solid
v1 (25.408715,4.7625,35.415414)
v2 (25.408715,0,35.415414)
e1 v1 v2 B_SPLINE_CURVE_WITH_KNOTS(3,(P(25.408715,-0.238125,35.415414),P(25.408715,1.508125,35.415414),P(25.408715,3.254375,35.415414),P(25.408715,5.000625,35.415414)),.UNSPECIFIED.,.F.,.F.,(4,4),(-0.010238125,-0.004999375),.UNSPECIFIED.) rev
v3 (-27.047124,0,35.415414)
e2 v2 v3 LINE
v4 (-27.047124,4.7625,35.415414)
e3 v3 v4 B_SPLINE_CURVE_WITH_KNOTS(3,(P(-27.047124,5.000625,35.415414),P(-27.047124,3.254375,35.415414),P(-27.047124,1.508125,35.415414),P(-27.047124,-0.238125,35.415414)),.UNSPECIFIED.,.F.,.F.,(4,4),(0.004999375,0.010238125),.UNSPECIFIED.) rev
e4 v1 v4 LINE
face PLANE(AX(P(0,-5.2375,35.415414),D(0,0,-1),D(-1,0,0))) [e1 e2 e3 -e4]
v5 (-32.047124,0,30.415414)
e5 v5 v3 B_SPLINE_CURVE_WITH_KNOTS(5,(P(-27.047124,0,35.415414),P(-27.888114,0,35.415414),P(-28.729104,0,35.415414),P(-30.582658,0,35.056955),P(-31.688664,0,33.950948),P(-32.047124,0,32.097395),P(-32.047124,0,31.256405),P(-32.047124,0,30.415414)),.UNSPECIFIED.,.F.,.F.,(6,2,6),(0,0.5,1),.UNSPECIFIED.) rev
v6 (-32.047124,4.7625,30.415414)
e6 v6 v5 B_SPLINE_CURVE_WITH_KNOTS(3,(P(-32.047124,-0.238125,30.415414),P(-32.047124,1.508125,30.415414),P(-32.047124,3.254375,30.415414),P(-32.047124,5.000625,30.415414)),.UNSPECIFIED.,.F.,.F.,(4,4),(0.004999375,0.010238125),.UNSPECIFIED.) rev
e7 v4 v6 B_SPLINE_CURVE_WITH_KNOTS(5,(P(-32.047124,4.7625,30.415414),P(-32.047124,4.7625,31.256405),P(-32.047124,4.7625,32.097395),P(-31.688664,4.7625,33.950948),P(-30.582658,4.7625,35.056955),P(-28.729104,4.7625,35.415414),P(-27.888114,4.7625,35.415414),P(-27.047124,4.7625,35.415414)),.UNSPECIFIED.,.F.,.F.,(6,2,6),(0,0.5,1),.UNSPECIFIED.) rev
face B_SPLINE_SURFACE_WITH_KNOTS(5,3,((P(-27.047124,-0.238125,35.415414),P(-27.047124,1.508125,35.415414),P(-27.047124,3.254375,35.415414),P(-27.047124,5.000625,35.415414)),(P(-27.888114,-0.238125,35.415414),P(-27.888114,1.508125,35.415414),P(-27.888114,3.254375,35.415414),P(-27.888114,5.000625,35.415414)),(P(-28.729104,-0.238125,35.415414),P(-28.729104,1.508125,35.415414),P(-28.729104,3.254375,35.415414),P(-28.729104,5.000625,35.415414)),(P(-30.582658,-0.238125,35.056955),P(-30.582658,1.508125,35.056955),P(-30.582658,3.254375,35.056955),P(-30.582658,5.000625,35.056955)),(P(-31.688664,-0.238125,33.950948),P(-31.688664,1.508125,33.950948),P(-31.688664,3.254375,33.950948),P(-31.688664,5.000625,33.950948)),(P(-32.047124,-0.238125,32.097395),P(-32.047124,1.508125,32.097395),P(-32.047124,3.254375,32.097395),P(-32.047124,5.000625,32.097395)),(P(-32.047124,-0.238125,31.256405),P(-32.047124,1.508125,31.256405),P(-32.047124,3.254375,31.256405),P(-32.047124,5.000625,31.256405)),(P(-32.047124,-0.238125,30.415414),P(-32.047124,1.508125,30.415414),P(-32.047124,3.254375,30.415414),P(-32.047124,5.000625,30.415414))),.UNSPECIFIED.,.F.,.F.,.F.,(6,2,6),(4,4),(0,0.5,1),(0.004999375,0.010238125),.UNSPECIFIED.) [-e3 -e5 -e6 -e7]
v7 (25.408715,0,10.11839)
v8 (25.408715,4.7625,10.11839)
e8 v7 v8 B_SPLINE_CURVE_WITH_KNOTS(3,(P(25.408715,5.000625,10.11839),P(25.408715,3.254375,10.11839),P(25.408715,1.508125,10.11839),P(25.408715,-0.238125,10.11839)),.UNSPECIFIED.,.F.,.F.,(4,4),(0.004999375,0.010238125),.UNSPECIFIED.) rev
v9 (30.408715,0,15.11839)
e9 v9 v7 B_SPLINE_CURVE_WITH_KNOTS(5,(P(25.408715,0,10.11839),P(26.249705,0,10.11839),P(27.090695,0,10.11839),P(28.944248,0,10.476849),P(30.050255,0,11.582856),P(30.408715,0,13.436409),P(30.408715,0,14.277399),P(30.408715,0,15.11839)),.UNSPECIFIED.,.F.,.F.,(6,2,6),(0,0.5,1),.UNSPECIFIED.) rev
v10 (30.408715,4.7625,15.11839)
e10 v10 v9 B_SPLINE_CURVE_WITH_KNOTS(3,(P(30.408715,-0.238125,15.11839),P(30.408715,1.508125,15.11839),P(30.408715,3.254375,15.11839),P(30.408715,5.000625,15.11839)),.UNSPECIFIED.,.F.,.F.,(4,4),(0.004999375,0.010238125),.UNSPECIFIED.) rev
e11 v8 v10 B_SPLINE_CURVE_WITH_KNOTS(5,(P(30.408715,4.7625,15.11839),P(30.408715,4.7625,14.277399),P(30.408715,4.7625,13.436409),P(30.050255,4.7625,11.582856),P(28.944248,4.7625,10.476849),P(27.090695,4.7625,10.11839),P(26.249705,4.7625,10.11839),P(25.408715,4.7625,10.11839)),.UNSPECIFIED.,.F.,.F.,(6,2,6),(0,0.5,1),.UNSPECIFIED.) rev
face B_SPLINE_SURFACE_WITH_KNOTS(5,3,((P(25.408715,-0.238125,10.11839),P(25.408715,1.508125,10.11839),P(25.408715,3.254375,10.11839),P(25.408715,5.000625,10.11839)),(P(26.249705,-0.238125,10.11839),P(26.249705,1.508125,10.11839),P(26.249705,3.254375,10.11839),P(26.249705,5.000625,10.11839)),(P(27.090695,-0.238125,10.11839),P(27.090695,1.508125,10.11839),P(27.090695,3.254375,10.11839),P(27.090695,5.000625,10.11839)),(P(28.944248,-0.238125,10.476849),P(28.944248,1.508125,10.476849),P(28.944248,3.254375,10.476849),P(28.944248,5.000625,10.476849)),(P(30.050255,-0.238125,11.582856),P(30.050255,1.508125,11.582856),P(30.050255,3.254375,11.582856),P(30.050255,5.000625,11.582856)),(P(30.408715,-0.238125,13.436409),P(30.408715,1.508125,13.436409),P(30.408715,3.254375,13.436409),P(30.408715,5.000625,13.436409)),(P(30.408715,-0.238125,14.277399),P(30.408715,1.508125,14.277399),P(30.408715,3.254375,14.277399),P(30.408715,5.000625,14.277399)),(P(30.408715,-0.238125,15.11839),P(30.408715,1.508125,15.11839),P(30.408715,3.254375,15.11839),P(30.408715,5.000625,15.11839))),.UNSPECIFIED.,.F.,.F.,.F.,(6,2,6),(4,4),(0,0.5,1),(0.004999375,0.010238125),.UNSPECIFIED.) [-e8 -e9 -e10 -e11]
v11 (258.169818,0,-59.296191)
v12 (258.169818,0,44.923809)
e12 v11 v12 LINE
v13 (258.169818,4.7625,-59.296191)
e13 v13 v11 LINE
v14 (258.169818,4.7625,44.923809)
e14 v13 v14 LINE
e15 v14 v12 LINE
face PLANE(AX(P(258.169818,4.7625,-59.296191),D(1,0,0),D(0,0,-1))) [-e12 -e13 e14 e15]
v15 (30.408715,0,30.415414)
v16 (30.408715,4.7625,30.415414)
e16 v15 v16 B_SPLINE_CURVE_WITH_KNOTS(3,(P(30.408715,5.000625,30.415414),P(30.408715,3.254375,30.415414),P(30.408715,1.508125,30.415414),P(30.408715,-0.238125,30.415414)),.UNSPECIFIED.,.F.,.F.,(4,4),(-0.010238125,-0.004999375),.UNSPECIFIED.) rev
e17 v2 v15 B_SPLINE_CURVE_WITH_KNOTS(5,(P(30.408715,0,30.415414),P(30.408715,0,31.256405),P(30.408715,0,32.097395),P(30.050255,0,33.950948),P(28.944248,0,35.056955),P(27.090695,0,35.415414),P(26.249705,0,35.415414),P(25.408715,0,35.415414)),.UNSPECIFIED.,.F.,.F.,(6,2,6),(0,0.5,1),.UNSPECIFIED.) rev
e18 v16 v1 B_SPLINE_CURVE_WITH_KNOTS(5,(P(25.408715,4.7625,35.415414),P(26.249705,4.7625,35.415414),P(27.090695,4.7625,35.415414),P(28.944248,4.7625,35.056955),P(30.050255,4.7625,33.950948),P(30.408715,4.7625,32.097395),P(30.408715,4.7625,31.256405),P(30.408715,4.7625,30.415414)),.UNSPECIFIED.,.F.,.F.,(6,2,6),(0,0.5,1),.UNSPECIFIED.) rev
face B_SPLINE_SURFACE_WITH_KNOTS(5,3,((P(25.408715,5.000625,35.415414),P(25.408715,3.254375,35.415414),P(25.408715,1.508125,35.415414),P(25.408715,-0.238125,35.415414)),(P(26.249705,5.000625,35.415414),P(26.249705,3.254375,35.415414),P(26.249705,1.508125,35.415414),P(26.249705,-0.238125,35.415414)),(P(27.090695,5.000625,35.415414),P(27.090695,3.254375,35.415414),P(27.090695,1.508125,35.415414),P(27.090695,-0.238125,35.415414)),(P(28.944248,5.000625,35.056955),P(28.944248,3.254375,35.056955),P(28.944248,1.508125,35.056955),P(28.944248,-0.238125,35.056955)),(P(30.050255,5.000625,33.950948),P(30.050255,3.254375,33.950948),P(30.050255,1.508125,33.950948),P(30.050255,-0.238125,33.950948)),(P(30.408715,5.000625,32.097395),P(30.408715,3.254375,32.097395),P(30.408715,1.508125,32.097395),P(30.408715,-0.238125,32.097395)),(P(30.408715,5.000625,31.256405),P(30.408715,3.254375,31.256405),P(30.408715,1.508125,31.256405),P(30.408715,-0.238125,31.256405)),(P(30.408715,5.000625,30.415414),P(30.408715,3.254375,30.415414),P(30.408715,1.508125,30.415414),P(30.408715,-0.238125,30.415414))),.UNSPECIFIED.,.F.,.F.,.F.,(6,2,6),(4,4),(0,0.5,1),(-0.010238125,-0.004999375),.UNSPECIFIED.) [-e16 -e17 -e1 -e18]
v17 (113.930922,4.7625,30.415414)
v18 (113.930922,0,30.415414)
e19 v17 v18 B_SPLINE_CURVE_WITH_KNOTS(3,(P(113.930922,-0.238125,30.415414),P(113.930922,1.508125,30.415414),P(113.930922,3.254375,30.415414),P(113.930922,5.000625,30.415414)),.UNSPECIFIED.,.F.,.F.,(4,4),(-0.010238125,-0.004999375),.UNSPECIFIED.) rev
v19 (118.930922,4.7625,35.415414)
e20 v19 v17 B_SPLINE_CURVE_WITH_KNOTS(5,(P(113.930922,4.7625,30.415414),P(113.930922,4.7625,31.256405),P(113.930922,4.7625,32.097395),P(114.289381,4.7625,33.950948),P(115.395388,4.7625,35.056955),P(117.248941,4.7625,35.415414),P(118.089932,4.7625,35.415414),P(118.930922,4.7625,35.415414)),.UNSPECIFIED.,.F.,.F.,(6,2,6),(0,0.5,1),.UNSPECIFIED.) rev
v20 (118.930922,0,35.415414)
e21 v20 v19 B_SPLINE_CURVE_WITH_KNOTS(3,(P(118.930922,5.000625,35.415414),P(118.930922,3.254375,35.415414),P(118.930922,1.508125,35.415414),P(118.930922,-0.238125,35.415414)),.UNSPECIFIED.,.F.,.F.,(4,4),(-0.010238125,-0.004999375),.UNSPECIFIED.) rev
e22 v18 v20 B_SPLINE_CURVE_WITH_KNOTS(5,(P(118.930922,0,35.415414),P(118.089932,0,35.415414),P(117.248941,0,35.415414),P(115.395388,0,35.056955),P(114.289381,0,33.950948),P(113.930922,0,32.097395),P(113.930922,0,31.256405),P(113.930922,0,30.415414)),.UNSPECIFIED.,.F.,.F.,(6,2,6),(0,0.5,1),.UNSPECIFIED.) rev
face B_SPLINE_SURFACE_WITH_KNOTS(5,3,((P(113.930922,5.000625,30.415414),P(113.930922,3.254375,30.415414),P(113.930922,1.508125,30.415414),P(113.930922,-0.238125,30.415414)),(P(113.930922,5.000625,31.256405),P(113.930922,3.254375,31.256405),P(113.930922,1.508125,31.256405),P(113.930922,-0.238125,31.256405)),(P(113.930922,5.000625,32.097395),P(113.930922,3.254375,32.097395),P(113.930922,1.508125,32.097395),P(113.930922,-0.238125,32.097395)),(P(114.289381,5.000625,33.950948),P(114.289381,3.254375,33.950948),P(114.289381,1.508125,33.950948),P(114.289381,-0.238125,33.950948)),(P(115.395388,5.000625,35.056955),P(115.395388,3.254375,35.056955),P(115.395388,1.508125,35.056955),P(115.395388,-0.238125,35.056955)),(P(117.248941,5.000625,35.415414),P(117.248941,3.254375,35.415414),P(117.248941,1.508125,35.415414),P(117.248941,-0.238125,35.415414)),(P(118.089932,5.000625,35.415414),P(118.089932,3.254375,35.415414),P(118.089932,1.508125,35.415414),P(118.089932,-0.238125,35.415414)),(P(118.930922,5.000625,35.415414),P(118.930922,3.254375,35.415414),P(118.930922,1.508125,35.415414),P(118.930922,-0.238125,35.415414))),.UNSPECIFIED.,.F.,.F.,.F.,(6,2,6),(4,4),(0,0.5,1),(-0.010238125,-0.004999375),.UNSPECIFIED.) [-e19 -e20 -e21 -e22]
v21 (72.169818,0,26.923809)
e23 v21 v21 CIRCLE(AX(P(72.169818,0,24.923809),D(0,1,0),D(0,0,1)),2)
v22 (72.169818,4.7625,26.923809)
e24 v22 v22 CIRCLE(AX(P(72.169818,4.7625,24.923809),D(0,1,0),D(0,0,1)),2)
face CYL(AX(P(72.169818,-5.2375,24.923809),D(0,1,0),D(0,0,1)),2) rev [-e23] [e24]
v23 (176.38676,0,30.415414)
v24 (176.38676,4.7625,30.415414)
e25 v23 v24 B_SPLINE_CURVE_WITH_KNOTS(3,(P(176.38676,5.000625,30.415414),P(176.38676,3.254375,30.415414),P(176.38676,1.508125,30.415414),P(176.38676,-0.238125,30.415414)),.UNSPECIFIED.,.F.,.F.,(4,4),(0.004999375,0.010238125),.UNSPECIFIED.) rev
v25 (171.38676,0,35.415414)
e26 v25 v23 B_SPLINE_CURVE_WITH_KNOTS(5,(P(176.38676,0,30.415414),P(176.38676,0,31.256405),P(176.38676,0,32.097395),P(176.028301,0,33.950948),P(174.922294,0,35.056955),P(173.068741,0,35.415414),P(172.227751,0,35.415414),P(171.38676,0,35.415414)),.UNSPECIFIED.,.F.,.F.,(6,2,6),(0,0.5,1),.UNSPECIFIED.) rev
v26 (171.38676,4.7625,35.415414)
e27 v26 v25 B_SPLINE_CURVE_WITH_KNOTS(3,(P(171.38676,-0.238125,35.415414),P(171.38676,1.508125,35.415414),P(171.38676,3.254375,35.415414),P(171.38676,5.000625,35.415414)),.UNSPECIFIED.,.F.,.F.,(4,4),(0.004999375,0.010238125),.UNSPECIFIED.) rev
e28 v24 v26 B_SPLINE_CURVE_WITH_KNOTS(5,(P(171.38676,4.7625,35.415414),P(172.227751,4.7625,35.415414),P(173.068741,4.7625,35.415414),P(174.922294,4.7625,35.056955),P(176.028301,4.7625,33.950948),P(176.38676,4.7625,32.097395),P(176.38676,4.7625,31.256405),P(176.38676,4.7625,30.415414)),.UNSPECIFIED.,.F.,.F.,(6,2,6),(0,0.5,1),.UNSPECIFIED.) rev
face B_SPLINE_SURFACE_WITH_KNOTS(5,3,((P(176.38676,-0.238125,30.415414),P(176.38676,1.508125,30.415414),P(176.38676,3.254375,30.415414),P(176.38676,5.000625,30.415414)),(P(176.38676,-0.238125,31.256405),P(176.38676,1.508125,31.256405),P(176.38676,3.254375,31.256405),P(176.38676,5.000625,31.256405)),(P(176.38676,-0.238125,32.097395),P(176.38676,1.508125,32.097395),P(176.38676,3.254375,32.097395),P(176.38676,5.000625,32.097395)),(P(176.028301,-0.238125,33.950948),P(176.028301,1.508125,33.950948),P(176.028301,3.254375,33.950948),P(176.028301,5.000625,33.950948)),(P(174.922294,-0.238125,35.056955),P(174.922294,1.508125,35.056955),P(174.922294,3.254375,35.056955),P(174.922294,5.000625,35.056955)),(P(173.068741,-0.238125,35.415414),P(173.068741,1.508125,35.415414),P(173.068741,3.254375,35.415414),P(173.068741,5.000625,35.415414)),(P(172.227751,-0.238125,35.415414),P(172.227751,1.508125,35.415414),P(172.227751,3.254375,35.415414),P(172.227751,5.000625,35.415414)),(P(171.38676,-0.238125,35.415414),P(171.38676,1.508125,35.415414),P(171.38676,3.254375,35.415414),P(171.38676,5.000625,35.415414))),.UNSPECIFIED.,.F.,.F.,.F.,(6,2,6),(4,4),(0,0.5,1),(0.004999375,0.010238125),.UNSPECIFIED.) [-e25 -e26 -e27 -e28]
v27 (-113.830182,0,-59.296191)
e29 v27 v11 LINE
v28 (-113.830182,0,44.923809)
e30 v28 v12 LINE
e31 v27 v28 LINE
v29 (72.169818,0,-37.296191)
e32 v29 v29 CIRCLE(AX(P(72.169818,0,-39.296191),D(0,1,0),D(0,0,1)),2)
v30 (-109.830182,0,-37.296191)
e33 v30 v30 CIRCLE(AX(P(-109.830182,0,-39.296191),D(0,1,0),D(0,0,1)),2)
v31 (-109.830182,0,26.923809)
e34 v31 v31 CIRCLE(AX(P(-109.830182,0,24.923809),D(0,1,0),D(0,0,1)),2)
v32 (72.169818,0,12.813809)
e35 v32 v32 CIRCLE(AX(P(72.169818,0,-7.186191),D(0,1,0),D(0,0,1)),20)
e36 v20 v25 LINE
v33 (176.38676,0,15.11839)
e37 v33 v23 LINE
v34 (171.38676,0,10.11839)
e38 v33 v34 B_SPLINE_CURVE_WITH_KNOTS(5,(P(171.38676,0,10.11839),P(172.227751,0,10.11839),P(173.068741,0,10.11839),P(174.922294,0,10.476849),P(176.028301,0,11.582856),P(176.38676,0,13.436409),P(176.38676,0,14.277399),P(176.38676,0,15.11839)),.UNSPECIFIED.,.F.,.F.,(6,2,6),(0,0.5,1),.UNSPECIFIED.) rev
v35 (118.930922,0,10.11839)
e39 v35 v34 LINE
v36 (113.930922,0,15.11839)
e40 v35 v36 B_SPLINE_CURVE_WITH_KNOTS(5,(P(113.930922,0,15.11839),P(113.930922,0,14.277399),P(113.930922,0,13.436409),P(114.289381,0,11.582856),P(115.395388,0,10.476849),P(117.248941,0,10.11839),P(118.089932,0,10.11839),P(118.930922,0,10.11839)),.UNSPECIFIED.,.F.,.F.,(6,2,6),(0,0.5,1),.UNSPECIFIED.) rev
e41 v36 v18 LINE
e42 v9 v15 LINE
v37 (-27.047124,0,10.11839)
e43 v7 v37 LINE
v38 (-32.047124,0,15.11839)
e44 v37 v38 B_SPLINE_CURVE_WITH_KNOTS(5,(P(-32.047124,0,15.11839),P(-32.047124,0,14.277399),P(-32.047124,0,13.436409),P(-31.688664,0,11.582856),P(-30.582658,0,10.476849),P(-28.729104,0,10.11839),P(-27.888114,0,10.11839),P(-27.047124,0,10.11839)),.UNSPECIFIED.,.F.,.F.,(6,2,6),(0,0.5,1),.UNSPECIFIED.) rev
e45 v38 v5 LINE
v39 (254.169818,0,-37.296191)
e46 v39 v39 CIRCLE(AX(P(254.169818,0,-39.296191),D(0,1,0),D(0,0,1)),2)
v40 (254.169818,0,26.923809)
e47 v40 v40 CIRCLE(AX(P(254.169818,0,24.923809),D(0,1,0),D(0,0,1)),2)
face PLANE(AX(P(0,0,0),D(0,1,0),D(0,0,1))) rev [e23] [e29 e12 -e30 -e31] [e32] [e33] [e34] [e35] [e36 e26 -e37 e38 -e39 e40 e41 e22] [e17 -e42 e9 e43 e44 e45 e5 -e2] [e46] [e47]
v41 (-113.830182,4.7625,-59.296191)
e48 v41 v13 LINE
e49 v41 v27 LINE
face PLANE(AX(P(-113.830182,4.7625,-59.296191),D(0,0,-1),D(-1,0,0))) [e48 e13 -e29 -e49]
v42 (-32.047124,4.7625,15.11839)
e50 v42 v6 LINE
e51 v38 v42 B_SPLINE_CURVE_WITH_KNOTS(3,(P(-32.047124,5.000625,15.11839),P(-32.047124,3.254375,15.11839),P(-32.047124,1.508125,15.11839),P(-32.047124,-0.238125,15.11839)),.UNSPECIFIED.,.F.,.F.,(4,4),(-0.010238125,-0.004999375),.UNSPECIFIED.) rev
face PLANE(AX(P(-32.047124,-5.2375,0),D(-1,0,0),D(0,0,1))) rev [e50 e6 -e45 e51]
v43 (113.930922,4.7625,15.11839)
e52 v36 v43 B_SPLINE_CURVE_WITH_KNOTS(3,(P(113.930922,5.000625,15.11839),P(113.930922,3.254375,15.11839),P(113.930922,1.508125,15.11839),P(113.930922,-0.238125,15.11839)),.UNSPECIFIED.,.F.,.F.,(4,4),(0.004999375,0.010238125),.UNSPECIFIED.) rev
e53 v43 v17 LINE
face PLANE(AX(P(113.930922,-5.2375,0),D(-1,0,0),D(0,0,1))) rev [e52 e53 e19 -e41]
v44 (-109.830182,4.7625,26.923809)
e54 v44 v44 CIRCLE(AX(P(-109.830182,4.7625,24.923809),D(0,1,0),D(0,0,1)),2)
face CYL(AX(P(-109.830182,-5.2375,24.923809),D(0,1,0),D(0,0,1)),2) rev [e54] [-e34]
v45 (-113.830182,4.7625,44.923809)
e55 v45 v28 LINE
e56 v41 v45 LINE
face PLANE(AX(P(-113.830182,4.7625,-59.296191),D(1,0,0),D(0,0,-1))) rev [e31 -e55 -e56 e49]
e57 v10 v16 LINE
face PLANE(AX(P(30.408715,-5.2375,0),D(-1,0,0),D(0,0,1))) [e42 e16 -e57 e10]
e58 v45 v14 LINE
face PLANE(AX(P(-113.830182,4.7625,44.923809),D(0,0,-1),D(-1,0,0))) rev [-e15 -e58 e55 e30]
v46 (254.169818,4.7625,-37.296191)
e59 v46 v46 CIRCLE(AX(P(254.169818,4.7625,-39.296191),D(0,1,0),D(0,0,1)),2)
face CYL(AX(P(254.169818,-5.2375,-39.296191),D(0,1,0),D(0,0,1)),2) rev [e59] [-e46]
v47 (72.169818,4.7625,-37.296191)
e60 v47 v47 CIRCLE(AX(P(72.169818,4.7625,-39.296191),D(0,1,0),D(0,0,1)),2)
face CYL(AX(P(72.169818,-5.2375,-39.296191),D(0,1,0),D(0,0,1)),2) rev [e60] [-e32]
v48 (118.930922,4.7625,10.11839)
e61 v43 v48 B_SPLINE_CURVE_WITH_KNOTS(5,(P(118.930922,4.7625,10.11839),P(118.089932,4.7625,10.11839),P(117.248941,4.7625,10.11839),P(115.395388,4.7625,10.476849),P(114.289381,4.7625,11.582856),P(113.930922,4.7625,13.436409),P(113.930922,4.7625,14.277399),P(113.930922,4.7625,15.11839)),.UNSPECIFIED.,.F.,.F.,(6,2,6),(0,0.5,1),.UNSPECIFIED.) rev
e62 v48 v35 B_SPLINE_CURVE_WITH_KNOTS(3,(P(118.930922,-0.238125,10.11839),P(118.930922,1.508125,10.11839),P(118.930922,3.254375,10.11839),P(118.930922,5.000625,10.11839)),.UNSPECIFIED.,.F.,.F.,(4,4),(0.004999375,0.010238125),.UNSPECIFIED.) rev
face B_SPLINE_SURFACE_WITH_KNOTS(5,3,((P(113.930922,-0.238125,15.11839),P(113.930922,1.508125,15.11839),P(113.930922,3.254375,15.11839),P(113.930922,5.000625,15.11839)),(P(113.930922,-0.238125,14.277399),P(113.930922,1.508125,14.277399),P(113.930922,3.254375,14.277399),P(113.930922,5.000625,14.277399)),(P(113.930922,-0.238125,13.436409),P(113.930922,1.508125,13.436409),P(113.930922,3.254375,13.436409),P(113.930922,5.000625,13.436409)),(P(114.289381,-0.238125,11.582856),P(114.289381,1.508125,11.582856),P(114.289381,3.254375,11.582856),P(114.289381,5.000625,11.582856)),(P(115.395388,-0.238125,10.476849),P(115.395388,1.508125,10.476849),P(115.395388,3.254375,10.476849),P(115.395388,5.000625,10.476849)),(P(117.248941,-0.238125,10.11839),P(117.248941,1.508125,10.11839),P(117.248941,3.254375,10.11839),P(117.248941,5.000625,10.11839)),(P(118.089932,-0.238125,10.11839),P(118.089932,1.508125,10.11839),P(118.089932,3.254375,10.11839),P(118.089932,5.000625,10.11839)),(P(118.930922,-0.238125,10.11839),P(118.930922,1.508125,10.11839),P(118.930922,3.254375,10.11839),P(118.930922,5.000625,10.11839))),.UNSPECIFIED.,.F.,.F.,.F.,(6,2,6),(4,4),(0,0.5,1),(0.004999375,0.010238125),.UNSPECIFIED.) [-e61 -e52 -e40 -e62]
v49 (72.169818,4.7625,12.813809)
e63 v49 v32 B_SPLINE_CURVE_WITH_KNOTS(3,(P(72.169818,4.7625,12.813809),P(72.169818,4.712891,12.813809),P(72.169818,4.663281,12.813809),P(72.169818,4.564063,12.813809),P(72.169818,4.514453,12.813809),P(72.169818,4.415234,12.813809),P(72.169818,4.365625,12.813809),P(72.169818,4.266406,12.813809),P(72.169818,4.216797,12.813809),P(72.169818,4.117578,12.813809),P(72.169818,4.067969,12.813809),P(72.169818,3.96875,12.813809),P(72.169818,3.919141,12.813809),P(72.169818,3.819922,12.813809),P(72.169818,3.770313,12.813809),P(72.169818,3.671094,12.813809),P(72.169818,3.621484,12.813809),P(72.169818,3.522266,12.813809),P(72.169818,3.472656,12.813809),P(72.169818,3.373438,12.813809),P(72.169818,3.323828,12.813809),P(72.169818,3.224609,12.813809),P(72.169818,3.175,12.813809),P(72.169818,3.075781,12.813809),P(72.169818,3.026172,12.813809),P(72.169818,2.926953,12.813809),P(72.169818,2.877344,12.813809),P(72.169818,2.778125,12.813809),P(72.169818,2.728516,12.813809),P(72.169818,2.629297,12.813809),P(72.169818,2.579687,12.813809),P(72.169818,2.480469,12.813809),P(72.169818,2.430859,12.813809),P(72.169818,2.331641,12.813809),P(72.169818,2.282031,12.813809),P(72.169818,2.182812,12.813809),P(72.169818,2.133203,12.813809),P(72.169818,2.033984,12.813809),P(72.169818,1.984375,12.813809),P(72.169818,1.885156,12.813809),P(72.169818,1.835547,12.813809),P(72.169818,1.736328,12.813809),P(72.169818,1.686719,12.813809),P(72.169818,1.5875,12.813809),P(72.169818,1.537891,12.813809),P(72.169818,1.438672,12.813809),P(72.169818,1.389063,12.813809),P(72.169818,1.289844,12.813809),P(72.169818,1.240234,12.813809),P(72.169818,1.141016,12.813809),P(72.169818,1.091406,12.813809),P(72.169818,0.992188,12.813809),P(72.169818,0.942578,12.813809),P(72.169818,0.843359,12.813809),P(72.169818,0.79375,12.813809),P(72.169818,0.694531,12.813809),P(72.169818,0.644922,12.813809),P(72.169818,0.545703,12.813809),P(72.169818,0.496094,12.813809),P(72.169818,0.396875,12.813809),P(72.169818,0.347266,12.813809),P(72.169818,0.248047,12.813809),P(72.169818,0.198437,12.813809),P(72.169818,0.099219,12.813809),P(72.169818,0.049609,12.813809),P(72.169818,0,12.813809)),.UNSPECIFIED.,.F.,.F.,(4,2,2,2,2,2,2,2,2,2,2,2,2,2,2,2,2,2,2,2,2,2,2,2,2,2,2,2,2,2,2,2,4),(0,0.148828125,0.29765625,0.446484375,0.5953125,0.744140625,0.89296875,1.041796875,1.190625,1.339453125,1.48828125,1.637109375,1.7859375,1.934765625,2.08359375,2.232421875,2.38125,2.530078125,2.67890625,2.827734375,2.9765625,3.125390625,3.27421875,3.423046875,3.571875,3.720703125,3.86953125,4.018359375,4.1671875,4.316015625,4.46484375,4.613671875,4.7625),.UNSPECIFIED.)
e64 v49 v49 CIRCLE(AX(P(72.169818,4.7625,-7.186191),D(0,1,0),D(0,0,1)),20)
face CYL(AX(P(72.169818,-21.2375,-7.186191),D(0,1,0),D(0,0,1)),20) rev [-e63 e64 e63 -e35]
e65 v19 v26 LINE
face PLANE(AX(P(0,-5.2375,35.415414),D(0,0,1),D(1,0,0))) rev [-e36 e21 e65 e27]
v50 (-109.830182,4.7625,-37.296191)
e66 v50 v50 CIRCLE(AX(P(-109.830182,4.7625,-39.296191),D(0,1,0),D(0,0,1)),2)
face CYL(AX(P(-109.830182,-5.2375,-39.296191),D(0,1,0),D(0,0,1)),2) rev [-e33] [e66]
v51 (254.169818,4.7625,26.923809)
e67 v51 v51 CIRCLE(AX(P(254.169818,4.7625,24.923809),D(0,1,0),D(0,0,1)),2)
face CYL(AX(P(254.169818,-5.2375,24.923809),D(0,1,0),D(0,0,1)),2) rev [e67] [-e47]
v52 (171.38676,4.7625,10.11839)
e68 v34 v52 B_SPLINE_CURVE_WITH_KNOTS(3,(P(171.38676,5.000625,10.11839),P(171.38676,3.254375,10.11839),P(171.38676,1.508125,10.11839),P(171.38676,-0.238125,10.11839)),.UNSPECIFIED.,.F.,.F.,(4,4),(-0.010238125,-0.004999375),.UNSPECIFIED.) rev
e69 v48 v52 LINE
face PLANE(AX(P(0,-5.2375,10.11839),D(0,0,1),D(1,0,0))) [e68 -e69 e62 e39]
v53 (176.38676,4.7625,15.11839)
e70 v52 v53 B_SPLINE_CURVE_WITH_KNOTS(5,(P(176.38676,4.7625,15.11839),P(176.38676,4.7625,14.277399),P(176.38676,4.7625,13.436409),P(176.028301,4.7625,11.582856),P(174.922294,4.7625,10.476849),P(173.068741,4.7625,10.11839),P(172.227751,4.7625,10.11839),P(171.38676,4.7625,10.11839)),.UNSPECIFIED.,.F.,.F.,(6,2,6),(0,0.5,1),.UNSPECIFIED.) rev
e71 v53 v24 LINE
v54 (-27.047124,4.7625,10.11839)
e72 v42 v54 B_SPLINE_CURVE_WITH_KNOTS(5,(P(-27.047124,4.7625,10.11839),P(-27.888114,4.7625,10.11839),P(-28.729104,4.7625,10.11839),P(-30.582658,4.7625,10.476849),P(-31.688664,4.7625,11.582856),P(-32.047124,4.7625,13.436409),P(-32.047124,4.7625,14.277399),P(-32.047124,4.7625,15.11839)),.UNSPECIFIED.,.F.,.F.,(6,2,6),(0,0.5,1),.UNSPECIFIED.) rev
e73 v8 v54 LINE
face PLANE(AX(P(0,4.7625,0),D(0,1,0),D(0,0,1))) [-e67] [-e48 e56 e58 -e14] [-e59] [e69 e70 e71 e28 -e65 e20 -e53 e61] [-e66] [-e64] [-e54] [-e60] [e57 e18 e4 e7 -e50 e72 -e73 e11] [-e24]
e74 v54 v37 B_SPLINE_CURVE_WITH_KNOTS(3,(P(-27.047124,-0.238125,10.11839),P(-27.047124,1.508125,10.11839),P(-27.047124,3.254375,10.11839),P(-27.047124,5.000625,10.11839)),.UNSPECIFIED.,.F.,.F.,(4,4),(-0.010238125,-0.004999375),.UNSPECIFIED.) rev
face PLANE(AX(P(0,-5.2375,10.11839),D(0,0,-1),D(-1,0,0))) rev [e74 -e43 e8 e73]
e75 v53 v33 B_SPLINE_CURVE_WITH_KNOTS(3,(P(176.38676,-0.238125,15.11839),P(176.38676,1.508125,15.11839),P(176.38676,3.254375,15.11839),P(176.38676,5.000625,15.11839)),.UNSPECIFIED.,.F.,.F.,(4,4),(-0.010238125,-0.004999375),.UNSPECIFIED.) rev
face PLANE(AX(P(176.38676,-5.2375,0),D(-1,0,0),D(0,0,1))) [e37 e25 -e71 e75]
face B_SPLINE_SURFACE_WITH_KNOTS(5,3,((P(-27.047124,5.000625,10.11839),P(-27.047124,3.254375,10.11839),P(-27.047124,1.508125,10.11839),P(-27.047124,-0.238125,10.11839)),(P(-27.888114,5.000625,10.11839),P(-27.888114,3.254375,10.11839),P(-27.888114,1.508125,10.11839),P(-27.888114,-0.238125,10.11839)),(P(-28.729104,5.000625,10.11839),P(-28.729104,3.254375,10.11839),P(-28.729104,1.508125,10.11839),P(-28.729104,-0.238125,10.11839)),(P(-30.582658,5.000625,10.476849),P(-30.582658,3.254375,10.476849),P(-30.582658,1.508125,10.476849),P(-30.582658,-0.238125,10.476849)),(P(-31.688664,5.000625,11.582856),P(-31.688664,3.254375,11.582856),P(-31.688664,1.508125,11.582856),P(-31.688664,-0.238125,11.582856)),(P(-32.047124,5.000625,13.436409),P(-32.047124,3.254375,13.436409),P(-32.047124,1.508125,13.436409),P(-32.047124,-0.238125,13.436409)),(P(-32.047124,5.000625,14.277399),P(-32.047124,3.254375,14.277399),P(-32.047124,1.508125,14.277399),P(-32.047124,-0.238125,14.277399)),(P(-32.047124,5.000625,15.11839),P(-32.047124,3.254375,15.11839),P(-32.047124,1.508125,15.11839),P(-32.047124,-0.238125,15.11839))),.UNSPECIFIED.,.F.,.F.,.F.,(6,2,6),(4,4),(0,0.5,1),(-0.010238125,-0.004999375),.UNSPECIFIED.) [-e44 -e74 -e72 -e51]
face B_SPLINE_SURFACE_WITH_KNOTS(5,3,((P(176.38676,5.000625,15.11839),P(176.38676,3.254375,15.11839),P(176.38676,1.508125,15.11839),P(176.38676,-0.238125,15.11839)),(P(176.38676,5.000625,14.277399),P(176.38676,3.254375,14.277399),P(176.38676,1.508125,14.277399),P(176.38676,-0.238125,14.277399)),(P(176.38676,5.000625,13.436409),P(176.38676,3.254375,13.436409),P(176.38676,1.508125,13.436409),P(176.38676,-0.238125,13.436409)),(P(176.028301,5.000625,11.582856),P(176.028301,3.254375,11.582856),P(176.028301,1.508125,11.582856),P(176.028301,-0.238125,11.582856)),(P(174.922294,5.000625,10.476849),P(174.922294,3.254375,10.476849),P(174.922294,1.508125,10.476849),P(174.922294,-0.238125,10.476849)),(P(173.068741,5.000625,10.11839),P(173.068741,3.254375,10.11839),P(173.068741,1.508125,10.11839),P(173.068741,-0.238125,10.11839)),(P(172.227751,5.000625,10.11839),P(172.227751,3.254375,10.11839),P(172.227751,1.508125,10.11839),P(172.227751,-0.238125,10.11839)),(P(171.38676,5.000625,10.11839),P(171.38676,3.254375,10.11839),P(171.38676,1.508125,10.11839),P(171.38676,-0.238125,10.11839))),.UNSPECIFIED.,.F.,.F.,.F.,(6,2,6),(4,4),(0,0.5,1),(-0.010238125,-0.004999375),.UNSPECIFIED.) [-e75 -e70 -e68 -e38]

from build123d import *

# Parameters (mm, degrees)
SKETCH1_W           = 372
SKETCH1_H           = 104.22
BOSS_EXTRUDE1_DEPTH = 4.7625
SKETCH2_R           = 2
CUT_EXTRUDE1_DEPTH  = 10
SKETCH3_R           = 2
CUT_EXTRUDE2_DEPTH  = 10
CUT_EXTRUDE3_DEPTH  = 26
SKETCH5_W           = 62.455838456
SKETCH5_H           = 25.297024562
CUT_EXTRUDE4_DEPTH  = 10
FILLET2_SIZE        = 5


with BuildPart() as part:
    # Sketch1 → Boss-Extrude1 (new body)
    with BuildSketch(Plane(origin=(0, 0, 0), x_dir=(1, 0, 0), z_dir=(0, 1, 0))):
        with Locations((72.169818201, 7.186191072)):
            Rectangle(SKETCH1_W, SKETCH1_H)
    extrude(amount=BOSS_EXTRUDE1_DEPTH)

    # Sketch2 → Cut-Extrude1 (cut)
    with BuildSketch(Plane(origin=(0, 4.7625, 0), x_dir=(1, 0, 0), z_dir=(0, 1, 0))):
        with BuildLine():
            ThreePointArc((-107.830181799, 39.296191072), (-108.415968237, 40.710404634), (-109.830181799, 41.296191072))
            Line((-109.830181799, 41.296191072), (-109.830181799, 39.296191072))
            Line((-109.830181799, 39.296191072), (-111.830181799, 39.296191072))
            ThreePointArc((-111.830181799, 39.296191072), (-109.830181799, 37.296191072), (-107.830181799, 39.296191072))
        make_face()
        with BuildLine():
            Line((-109.830181799, 39.296191072), (-109.830181799, 41.296191072))
            ThreePointArc((-109.830181799, 41.296191072), (-111.244395361, 40.710404634), (-111.830181799, 39.296191072))
            Line((-111.830181799, 39.296191072), (-109.830181799, 39.296191072))
        make_face()
        with BuildLine():
            ThreePointArc((256.169818201, 39.296191072), (255.584031763, 40.710404634), (254.169818201, 41.296191072))
            Line((254.169818201, 41.296191072), (254.169818201, 39.296191072))
            Line((254.169818201, 39.296191072), (256.169818201, 39.296191072))
        make_face()
        with BuildLine():
            Line((254.169818201, 39.296191072), (254.169818201, 41.296191072))
            ThreePointArc((254.169818201, 41.296191072), (252.755604639, 37.88197751), (256.169818201, 39.296191072))
            Line((256.169818201, 39.296191072), (254.169818201, 39.296191072))
        make_face()
        with Locations(Location((-109.830181799, -24.923808928, 0), (0, 0, 270))):
            Circle(SKETCH2_R)
        with Locations(Location((254.169818201, -24.923808928, 0), (0, 0, 270))):
            Circle(SKETCH2_R)
    extrude(amount=-CUT_EXTRUDE1_DEPTH, mode=Mode.SUBTRACT)

    # Sketch3 → Cut-Extrude2 (cut)
    with BuildSketch(Plane(origin=(0, 4.7625, 0), x_dir=(1, 0, 0), z_dir=(0, 1, 0))):
        with Locations(Location((72.169818201, 39.296191072, 0), (0, 0, 270))):
            Circle(SKETCH3_R)
        with Locations(Location((72.169818201, -24.923808928, 0), (0, 0, 270))):
            Circle(SKETCH3_R)
    extrude(amount=-CUT_EXTRUDE2_DEPTH, mode=Mode.SUBTRACT)

    # Sketch4 → Cut-Extrude3 (cut)
    with BuildSketch(Plane(origin=(0, 4.7625, 0), x_dir=(1, 0, 0), z_dir=(0, 1, 0))):
        with BuildLine():
            ThreePointArc((92.169818201, 7.186191072), (86.311953825, 21.328326696), (72.169818201, 27.186191072))
            Line((72.169818201, 27.186191072), (72.169818201, -12.813808928))
            ThreePointArc((72.169818201, -12.813808928), (86.311953825, -6.955944552), (92.169818201, 7.186191072))
        make_face()
        with BuildLine():
            Line((72.169818201, -12.813808928), (72.169818201, 27.186191072))
            ThreePointArc((72.169818201, 27.186191072), (52.169818201, 7.186191072), (72.169818201, -12.813808928))
        make_face()
    extrude(amount=-CUT_EXTRUDE3_DEPTH, mode=Mode.SUBTRACT)

    # Sketch5 → Cut-Extrude4 (cut)
    with BuildSketch(Plane(origin=(0, 4.7625, 0), x_dir=(1, 0, 0), z_dir=(0, 1, 0))):
        with Locations((-0.819204667, -22.766901993)):
            Rectangle(SKETCH5_W, SKETCH5_H)
        with Locations((145.158841069, -22.766901993)):
            Rectangle(SKETCH5_W, SKETCH5_H)
    extrude(amount=-CUT_EXTRUDE4_DEPTH, mode=Mode.SUBTRACT)

    # Fillet2
    # a fillet whose section is not a circle: 5 mm, written as the material it adds along each edge
    with BuildSketch(Plane(origin=(176.386760297, 4.7625, 35.415414274), x_dir=(0, 0, -1), z_dir=(0, -1, 0)), Plane(origin=(113.930921841, 4.7625, 10.118389712), x_dir=(0, 0, 1), z_dir=(0, -1, 0)), Plane(origin=(113.930921841, 4.7625, 35.415414274), x_dir=(1, 0, 0), z_dir=(0, -1, 0)), Plane(origin=(30.408714561, 4.7625, 35.415414274), x_dir=(0, 0, -1), z_dir=(0, -1, 0)), Plane(origin=(30.408714561, 4.7625, 10.118389712), x_dir=(-1, 0, 0), z_dir=(0, -1, 0)), Plane(origin=(-32.047123895, 4.7625, 35.415414274), x_dir=(1, 0, 0), z_dir=(0, -1, 0))) as fillet2_piece_1:
        with BuildLine():
            add(Edge.make_bspline([(FILLET2_SIZE, 0), (FILLET2_SIZE * 0.831801948466, 0), (FILLET2_SIZE * 0.663603896932, 0), (FILLET2_SIZE * 0.292893218813, -FILLET2_SIZE * 0.0716919198361), (FILLET2_SIZE * 0.0716919198361, -FILLET2_SIZE * 0.292893218813), (0, -FILLET2_SIZE * 0.663603896932), (0, -FILLET2_SIZE * 0.831801948466), (0, -FILLET2_SIZE)], knots=[0, 0, 0, 0, 0, 0, 0.5, 0.5, 1, 1, 1, 1, 1, 1], degree=5))
            Line((0, -FILLET2_SIZE), (-FILLET2_SIZE * 0.02, -FILLET2_SIZE))
            Line((-FILLET2_SIZE * 0.02, -FILLET2_SIZE), (-FILLET2_SIZE * 0.02, FILLET2_SIZE * 0.02))
            Line((-FILLET2_SIZE * 0.02, FILLET2_SIZE * 0.02), (FILLET2_SIZE, FILLET2_SIZE * 0.02))
            Line((FILLET2_SIZE, FILLET2_SIZE * 0.02), (FILLET2_SIZE, 0))
        make_face()
    extrude(amount=4.7625)
    with BuildSketch(Plane(origin=(176.386760297, 4.7625, 10.118389712), x_dir=(0, 0, 1), z_dir=(0, -1, 0)), Plane(origin=(-32.047123895, 4.7625, 10.118389712), x_dir=(1, 0, 0), z_dir=(0, -1, 0))) as fillet2_piece_2:
        with BuildLine():
            add(Edge.make_bspline([(FILLET2_SIZE, 0), (FILLET2_SIZE * 0.831801948466, 0), (FILLET2_SIZE * 0.663603896932, 0), (FILLET2_SIZE * 0.292893218813, FILLET2_SIZE * 0.0716919198361), (FILLET2_SIZE * 0.0716919198361, FILLET2_SIZE * 0.292893218813), (0, FILLET2_SIZE * 0.663603896932), (0, FILLET2_SIZE * 0.831801948466), (0, FILLET2_SIZE)], knots=[0, 0, 0, 0, 0, 0, 0.5, 0.5, 1, 1, 1, 1, 1, 1], degree=5))
            Line((0, FILLET2_SIZE), (-FILLET2_SIZE * 0.02, FILLET2_SIZE))
            Line((-FILLET2_SIZE * 0.02, FILLET2_SIZE), (-FILLET2_SIZE * 0.02, -FILLET2_SIZE * 0.02))
            Line((-FILLET2_SIZE * 0.02, -FILLET2_SIZE * 0.02), (FILLET2_SIZE, -FILLET2_SIZE * 0.02))
            Line((FILLET2_SIZE, -FILLET2_SIZE * 0.02), (FILLET2_SIZE, 0))
        make_face()
    extrude(amount=4.7625)


solid = part.part
